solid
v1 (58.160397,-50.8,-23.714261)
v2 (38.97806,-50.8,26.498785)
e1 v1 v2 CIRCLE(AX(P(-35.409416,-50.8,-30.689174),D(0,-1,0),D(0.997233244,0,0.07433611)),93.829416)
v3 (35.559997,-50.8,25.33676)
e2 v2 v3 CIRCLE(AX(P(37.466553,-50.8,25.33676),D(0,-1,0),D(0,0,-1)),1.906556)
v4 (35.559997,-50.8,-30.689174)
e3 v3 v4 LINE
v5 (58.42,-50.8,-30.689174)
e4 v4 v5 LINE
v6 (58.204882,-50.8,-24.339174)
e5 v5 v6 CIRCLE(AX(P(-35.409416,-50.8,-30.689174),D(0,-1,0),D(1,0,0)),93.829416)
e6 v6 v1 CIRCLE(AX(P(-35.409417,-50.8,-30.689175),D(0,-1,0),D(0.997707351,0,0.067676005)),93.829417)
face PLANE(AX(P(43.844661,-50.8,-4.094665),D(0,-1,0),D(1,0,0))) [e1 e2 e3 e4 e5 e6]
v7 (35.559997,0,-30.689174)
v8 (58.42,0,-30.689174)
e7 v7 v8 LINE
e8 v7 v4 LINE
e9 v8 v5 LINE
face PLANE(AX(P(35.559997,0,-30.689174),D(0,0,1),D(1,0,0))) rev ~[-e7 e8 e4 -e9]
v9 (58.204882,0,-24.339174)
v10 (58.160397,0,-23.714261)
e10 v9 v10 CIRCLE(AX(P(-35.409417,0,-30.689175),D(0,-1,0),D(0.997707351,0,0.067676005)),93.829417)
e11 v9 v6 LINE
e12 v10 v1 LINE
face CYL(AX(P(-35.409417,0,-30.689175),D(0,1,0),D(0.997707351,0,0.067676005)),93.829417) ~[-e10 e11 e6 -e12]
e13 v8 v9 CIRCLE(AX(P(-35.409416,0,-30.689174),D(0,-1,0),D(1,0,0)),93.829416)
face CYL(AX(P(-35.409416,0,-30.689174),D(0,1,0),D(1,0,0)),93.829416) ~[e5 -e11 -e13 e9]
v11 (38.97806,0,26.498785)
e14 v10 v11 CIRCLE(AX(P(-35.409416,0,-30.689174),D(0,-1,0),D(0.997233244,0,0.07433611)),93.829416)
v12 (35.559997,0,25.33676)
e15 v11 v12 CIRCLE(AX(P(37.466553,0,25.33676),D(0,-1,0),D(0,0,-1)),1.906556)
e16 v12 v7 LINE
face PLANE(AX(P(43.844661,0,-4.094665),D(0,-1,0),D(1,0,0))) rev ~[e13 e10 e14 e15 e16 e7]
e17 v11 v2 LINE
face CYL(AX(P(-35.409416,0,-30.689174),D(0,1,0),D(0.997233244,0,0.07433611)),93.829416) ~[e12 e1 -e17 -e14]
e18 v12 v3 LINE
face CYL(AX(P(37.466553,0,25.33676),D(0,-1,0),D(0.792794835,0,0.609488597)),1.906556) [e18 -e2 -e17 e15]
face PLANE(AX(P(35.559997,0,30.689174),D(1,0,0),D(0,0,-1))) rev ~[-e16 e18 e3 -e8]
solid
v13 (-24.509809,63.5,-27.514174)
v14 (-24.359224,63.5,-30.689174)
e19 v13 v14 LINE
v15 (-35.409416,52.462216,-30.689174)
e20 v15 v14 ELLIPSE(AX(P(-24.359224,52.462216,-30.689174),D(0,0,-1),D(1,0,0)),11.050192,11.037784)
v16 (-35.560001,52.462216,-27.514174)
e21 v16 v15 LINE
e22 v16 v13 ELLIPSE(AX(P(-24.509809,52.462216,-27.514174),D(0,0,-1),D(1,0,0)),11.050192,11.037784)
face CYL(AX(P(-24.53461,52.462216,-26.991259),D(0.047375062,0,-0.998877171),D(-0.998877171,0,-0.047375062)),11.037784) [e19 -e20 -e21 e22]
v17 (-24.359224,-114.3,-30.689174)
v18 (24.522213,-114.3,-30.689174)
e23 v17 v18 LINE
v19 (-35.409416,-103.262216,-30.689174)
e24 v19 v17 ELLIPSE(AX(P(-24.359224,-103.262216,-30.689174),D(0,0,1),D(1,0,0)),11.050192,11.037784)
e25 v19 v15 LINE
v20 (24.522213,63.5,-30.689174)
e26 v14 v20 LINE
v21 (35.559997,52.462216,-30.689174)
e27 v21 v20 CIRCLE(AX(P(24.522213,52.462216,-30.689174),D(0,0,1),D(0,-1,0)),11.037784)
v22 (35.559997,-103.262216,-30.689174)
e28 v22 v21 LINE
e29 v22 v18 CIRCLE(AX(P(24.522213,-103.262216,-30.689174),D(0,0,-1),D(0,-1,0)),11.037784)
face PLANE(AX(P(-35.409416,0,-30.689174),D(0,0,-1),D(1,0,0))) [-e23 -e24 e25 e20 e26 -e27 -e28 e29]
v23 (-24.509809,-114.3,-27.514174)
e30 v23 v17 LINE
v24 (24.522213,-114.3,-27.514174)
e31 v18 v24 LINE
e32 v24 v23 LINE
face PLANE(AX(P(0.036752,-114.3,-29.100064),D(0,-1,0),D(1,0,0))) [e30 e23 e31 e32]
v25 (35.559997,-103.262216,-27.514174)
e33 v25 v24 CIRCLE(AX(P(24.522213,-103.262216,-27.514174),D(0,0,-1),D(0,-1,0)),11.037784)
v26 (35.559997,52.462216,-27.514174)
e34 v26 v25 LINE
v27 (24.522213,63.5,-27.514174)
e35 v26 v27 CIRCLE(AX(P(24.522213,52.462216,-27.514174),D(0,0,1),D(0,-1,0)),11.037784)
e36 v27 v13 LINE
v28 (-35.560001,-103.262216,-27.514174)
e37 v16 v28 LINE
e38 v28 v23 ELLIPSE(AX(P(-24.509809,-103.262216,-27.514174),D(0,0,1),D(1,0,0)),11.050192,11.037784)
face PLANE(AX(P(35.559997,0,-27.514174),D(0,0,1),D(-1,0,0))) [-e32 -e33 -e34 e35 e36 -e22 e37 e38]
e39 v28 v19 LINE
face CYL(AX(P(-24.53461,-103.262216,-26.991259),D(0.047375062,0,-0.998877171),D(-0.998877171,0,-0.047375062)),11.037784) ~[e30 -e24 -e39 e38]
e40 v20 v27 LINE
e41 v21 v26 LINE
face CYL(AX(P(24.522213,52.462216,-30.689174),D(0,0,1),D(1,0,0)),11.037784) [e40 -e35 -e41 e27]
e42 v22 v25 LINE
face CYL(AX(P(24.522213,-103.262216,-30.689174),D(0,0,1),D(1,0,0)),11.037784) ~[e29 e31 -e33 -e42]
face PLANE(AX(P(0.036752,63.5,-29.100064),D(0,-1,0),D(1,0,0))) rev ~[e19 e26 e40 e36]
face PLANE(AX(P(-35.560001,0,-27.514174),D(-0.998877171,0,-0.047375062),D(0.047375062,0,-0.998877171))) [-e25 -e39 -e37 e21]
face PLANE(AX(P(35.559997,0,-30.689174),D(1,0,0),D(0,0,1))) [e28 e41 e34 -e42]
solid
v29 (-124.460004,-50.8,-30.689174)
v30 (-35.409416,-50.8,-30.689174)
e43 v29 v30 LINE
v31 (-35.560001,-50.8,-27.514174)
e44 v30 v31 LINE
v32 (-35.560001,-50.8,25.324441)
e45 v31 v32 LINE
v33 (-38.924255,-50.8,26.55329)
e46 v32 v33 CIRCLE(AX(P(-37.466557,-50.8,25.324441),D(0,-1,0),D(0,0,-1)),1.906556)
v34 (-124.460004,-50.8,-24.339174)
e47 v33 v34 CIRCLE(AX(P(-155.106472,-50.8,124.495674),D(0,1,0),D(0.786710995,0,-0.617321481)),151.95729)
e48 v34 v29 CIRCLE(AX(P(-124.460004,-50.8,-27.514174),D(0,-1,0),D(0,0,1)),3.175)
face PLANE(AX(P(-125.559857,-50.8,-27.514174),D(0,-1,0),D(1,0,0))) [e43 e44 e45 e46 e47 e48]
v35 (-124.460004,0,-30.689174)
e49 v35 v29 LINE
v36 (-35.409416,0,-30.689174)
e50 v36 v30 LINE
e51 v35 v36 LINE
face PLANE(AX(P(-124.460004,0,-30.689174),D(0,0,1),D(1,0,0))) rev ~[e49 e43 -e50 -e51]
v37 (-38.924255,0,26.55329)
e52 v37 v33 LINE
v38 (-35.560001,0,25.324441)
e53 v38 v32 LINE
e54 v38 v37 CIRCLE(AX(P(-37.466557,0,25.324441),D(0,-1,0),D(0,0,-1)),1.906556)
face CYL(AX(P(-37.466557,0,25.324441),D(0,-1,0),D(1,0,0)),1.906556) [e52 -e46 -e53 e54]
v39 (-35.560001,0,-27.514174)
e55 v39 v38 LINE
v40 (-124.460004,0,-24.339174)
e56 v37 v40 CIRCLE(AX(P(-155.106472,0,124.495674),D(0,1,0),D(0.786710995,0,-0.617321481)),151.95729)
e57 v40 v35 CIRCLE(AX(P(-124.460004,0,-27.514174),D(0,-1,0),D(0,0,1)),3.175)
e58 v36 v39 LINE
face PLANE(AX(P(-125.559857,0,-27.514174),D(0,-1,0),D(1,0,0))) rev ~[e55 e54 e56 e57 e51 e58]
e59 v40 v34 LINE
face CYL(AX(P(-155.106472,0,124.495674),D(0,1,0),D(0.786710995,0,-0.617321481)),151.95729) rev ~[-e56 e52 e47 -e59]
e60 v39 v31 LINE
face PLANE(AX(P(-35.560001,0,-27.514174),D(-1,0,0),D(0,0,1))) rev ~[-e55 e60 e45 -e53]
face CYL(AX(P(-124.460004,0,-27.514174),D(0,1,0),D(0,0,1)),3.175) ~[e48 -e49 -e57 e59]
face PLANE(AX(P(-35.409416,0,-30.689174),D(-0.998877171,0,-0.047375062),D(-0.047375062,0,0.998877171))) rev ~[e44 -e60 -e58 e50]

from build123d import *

# Parameters (mm, degrees)
F1_DEPTH = 50.8
F2_DEPTH = 114.3
F3_DEPTH = 63.5
F4_R     = 1.9065558253
F4_2_R   = 1.9065558253
F5_R     = 11.0377844072


with BuildPart() as f1:
    # F0 (on Front) → F1 (new body)
    with BuildSketch(Plane.XZ):
        with BuildLine():
            ThreePointArc((-124.4600042701, -24.3391744789), (-127.6350042701, -27.5141744789), (-124.4600042701, -30.6891744789))
            Line((-124.4600042701, -30.6891744789), (-124.4600042701, -24.3391744789))
        make_face()
        with BuildLine():
            Line((-124.4600042701, -30.6891744789), (-35.409415784, -30.6891744789))
            Line((-35.409415784, -30.6891744789), (-35.5600006878, -27.5141744789))
            Line((-35.5600006878, -27.5141744789), (-35.5600006878, -24.3391744789))
            Line((-35.5600006878, -24.3391744789), (-35.5600006878, 30.6891744789))
            ThreePointArc((-35.5600006878, 30.6891744789), (-75.1282903874, -4.7115572136), (-124.4600042701, -24.3391744789))
            Line((-124.4600042701, -24.3391744789), (-124.4600042701, -30.6891744789))
        make_face()
    extrude(amount=F1_DEPTH)

    # F4
    f4_edges = [f1.edges().sort_by_distance(p)[0] for p in [
        (-35.560001, -25.4, 30.689174),
    ]]
    fillet(f4_edges, radius=F4_R)


with BuildPart() as f1b:
    # F0 (on Front) → F1, piece 2 (new body)
    with BuildSketch(Plane.XZ):
        with BuildLine():
            Line((35.5599969625, -27.5141744789), (35.5599969625, -30.6891744789))
            Line((35.5599969625, -30.6891744789), (58.42, -30.6891744789))
            ThreePointArc((58.42, -30.6891744789), (58.3662051014, -27.5123531227), (58.2048820896, -24.3391744789))
            ThreePointArc((58.2048820896, -24.3391744789), (58.1831610583, -24.0266804729), (58.1603968933, -23.7142607236))
            ThreePointArc((58.1603968933, -23.7142607236), (51.2405848867, 5.3071676983), (35.5599969625, 30.6891744789))
            Line((35.5599969625, 30.6891744789), (35.5599969625, -24.3391744789))
            Line((35.5599969625, -24.3391744789), (35.5599969625, -27.5141744789))
        make_face()
    extrude(amount=F1_DEPTH)

    # F4#2
    f4_2_edges = [f1b.edges().sort_by_distance(p)[0] for p in [
        (35.559997, -25.4, 30.689174),
    ]]
    fillet(f4_2_edges, radius=F4_2_R)


with BuildPart() as f2:
    # F0 (on Front) → F2 (new body)
    with BuildSketch(Plane.XZ):
        Polygon((-33.02, -30.6891744789), (33.02, -30.6891744789), (35.5599969625, -30.6891744789), (35.5599969625, -27.5141744789), (-35.5600006878, -27.5141744789), (-35.409415784, -30.6891744789), align=None)
    extrude(amount=F2_DEPTH)

    # F0 (on Front) → F3 (join)
    with BuildSketch(Plane.XZ):
        Polygon((-33.02, -30.6891744789), (33.02, -30.6891744789), (35.5599969625, -30.6891744789), (35.5599969625, -27.5141744789), (-35.5600006878, -27.5141744789), (-35.409415784, -30.6891744789), align=None)
    extrude(amount=-F3_DEPTH)

    # F5
    f5_edges = [f2.edges().sort_by_distance(p)[0] for p in [
        (-35.484708, -114.3, -29.101674),
        (35.559997, -114.3, -29.101674),
        (35.559997, 63.5, -29.101674),
        (-35.484708, 63.5, -29.101674),
    ]]
    fillet(f5_edges, radius=F5_R)


solid = Compound([f1.part, f1b.part, f2.part])
